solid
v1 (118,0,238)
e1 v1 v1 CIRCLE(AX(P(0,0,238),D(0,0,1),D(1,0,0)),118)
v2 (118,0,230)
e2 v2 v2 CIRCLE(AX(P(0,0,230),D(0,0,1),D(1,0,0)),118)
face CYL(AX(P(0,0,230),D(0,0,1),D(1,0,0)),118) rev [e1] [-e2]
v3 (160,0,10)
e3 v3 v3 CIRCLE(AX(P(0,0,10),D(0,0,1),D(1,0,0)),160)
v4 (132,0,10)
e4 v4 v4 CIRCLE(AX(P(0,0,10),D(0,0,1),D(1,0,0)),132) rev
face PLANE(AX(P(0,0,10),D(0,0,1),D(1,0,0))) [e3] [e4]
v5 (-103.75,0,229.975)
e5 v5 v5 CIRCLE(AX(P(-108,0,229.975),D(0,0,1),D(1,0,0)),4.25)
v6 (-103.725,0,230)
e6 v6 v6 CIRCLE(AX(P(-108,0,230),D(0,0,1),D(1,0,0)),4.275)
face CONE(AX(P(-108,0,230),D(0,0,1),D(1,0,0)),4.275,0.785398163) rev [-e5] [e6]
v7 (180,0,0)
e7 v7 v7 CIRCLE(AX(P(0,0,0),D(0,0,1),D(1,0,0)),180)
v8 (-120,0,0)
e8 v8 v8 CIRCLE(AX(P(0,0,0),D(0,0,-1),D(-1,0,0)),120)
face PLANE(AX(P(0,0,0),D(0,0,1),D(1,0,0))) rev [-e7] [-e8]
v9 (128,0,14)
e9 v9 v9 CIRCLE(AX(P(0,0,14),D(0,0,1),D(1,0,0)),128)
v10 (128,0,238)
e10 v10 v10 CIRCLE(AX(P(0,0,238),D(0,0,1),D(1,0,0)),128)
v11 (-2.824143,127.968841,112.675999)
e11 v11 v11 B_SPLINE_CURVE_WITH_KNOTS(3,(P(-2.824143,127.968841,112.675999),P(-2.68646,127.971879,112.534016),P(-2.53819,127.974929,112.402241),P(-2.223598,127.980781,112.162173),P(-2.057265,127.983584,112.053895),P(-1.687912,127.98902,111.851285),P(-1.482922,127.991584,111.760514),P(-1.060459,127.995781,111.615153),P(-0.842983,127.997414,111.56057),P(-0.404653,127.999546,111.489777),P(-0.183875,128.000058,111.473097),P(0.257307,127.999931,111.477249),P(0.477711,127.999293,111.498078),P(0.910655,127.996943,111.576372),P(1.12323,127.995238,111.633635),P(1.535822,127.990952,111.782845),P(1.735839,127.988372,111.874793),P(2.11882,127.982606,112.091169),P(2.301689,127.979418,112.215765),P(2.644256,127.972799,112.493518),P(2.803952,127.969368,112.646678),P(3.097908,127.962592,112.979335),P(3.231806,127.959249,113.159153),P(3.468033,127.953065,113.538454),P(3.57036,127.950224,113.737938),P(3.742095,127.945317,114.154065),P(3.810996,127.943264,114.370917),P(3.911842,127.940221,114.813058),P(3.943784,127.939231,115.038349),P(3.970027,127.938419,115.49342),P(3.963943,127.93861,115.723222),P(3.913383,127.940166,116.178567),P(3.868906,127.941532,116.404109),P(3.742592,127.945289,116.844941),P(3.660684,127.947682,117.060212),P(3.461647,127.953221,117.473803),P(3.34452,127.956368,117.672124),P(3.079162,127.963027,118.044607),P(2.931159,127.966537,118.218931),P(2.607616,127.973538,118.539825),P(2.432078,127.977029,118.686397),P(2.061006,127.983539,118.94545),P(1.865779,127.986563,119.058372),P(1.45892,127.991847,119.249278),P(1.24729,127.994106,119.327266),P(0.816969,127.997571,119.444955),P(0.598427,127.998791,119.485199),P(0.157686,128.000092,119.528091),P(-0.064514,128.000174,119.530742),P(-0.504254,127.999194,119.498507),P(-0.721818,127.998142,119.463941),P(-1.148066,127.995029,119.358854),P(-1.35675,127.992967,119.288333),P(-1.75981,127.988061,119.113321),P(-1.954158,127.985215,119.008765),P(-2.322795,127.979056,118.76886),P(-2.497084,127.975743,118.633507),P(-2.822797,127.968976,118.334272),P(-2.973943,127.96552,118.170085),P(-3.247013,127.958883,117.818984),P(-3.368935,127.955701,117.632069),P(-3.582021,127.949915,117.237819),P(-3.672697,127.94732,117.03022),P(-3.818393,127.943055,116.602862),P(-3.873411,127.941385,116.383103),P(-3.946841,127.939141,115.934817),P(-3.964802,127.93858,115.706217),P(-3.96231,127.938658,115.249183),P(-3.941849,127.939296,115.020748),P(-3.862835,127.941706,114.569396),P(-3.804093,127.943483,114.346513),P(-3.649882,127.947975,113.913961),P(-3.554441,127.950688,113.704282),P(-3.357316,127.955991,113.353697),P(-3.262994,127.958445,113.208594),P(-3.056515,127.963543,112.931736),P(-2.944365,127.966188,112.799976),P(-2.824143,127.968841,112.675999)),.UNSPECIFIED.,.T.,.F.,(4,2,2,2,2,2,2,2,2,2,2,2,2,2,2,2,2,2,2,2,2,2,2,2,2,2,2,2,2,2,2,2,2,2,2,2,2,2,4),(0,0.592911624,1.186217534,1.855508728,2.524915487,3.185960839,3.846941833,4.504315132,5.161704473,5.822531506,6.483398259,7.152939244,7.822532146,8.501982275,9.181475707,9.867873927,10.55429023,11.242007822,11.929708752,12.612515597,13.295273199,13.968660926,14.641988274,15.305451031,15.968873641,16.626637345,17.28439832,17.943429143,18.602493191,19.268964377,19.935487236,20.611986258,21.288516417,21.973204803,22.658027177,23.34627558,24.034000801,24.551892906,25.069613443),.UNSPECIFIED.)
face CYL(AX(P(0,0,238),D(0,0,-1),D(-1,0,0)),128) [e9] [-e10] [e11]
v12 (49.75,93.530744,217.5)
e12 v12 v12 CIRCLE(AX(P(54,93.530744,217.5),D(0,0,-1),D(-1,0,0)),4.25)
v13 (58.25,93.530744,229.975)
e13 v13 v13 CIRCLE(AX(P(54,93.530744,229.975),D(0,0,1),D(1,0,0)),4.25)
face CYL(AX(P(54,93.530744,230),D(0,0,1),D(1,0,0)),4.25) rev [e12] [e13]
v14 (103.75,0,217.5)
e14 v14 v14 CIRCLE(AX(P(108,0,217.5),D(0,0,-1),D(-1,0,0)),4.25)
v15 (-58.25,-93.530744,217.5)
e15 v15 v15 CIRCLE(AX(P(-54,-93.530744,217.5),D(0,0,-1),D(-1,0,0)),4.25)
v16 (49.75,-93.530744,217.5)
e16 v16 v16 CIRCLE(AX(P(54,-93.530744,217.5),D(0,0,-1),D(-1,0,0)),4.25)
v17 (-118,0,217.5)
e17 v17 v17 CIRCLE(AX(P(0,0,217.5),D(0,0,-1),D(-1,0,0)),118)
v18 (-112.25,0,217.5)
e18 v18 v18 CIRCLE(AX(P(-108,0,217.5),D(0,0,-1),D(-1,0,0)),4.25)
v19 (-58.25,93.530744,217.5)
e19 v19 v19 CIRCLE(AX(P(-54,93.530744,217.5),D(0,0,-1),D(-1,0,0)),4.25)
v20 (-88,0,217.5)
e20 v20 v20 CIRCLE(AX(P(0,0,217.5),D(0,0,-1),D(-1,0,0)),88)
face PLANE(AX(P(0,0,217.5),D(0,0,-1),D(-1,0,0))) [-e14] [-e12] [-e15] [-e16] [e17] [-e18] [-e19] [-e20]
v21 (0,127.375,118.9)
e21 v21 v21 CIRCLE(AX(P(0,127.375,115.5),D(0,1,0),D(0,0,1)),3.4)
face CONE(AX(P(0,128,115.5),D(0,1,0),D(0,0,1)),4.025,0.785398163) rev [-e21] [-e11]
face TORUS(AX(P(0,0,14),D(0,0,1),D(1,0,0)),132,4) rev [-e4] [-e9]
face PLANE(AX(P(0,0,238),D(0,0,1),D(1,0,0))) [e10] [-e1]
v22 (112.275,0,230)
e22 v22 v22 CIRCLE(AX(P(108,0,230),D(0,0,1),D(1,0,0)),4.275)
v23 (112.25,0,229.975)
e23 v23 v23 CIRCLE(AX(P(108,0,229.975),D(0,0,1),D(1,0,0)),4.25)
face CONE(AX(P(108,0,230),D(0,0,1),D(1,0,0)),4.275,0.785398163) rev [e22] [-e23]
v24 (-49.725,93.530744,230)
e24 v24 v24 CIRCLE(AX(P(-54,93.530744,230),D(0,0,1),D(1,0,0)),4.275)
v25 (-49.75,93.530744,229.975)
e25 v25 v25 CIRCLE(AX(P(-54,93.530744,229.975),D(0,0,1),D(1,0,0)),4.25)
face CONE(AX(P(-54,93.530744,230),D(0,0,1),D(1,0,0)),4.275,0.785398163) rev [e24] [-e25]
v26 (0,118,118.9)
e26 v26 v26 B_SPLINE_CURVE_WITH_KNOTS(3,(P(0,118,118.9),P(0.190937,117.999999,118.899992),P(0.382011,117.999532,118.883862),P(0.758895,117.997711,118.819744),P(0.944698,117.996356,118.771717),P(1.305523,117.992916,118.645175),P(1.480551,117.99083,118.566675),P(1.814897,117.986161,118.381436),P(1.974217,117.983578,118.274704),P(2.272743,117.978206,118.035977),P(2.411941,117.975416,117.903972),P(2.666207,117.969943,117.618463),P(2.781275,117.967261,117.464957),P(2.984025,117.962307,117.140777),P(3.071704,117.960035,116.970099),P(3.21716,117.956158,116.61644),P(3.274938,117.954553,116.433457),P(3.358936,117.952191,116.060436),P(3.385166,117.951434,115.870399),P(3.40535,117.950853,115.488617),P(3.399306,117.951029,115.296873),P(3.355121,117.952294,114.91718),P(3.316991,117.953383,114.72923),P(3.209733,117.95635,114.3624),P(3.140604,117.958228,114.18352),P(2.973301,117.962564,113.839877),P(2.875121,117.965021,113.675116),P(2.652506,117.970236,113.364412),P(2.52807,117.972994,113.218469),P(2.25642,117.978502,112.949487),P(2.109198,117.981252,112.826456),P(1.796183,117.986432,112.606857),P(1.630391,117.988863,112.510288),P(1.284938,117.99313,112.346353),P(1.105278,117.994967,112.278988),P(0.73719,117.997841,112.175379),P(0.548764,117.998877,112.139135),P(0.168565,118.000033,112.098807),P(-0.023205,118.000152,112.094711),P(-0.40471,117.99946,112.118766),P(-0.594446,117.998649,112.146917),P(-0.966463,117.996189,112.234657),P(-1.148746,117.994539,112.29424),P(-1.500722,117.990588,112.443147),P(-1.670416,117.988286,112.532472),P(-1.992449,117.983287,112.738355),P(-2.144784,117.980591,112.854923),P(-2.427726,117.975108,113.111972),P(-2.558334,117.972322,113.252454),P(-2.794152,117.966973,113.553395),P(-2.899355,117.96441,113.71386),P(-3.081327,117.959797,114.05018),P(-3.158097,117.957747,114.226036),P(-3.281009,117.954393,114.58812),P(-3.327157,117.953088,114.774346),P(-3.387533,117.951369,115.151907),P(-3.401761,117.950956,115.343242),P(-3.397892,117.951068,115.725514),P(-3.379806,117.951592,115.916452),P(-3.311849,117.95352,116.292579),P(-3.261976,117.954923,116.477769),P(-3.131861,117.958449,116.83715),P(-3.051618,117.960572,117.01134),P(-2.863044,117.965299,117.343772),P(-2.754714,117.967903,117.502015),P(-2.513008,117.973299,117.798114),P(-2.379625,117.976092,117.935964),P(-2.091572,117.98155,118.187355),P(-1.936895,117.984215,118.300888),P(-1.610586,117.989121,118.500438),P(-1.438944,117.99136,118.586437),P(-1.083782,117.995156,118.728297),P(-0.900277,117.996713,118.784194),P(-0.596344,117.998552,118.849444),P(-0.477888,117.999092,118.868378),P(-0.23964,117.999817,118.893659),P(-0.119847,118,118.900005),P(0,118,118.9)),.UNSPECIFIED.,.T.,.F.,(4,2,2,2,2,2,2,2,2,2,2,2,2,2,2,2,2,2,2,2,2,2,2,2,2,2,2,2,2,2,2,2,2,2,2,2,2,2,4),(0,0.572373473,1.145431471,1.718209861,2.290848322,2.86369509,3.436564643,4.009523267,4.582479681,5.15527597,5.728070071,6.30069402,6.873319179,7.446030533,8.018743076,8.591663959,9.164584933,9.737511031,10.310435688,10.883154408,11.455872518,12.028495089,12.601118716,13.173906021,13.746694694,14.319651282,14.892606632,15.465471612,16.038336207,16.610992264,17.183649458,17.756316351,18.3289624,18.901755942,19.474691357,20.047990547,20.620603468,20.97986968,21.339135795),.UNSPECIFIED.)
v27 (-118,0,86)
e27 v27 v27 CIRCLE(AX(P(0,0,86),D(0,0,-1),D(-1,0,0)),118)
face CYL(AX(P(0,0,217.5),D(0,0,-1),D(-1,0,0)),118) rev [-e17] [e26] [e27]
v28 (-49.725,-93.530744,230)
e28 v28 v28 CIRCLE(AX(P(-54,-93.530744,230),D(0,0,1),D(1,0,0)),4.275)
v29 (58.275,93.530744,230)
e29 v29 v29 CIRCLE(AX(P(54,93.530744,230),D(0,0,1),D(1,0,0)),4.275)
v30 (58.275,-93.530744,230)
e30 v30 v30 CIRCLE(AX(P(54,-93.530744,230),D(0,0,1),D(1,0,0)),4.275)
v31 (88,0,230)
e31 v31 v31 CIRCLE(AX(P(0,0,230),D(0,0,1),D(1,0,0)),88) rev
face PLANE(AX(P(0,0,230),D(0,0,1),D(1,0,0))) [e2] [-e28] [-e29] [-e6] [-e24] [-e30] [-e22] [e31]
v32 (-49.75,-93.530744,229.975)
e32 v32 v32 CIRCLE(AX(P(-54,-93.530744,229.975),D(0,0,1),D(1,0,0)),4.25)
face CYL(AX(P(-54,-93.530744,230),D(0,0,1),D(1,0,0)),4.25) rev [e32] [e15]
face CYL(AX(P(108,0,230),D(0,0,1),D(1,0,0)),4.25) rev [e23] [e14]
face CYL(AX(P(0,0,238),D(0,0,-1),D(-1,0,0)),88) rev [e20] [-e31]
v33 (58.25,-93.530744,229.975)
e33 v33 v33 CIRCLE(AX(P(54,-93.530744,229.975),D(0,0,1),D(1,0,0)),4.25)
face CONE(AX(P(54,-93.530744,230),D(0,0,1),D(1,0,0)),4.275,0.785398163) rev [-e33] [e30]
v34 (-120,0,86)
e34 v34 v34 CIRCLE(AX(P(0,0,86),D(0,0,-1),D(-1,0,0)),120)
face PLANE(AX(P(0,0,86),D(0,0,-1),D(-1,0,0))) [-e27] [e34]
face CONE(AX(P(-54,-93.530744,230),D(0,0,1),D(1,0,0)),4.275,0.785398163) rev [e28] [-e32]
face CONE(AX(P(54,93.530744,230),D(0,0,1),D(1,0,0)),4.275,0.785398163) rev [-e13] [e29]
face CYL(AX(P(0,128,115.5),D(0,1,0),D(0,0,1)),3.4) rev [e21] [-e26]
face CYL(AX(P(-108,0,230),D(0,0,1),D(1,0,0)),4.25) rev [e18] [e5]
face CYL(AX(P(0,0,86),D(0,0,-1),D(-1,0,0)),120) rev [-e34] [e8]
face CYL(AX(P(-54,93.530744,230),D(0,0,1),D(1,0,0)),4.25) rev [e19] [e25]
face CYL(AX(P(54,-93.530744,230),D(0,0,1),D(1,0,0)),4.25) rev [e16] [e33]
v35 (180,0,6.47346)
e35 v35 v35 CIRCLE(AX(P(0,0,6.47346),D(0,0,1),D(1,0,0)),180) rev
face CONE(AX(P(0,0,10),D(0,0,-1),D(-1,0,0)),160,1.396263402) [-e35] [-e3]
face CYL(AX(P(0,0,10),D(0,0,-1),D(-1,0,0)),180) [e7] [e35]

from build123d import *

# Parameters (mm, degrees)
SKETCH_1_R                    = 180
EXTRUDE_1_DEPTH               = 10
SKETCH_2_R                    = 128
EXTRUDE_2_DEPTH               = 238
SKETCH_3_R                    = 120
CUT_EXTRUDE_1_DEPTH           = 86
SKETCH_4_R                    = 118
CUT_EXTRUDE_2_DEPTH           = 131.5
SKETCH_5_R                    = 88
CUT_EXTRUDE_3_DEPTH           = 335.822714283
CUT_EXTRUDE_START             = -8
SKETCH_6_R                    = 118
CUT_EXTRUDE_4_DEPTH           = 8
HOLE_WIZARD_M10_1_D           = 8.5
HOLE_WIZARD_M10_1_CSINK_D     = 8.55
HOLE_WIZARD_M10_1_CSINK_ANGLE = 90
FILLET_1_R                    = 4
CHAMFER_1_SIZE                = 20
CHAMFER_1_SIZE2               = 3.526539614


# Read off the part's stored shape, not the designer's step: M8 螺纹孔1
with BuildPart() as part:
    # 草图1 → 凸台-拉伸1 (new body)
    with BuildSketch(Plane.XY):
        Circle(SKETCH_1_R)
    extrude(amount=EXTRUDE_1_DEPTH)

    # 草图2 → 凸台-拉伸2 (add)
    with BuildSketch(Plane.XY):
        Circle(SKETCH_2_R)
    extrude(amount=EXTRUDE_2_DEPTH)

    # 草图3 → 切除-拉伸1 (cut)
    with BuildSketch(Plane(origin=(0, 0, 0), x_dir=(-1, 0, 0), z_dir=(0, 0, -1))):
        Circle(SKETCH_3_R)
    extrude(amount=-CUT_EXTRUDE_1_DEPTH, mode=Mode.SUBTRACT)

    # 草图4 → 切除-拉伸2 (cut)
    with BuildSketch(Plane(origin=(0, 0, 86), x_dir=(-1, 0, 0), z_dir=(0, 0, -1))):
        Circle(SKETCH_4_R)
    extrude(amount=-CUT_EXTRUDE_2_DEPTH, mode=Mode.SUBTRACT)

    # 草图5 → 切除-拉伸3 (cut, through all)
    with BuildSketch(Plane(origin=(0, 0, 217.5), x_dir=(-1, 0, 0), z_dir=(0, 0, -1))):
        Circle(SKETCH_5_R)
    extrude(amount=-CUT_EXTRUDE_3_DEPTH, mode=Mode.SUBTRACT)

    # 草图6 → 切除-拉伸4 (cut)
    with BuildSketch(Plane.XY.offset(238).offset(CUT_EXTRUDE_START)):
        with Locations(Location((0, 0, 0), (0, 0, 180))):
            Circle(SKETCH_6_R)
    extrude(amount=CUT_EXTRUDE_4_DEPTH, mode=Mode.SUBTRACT)

    # M10 螺纹孔的螺纹孔钻头1 (through all)
    with Locations(Plane.XY.offset(230)):
        with Locations((108, 0), (54, -93.530743609), (-54, -93.530743609), (-108, 0), (-54, 93.530743609), (54, 93.530743609)):
            CounterSinkHole(HOLE_WIZARD_M10_1_D / 2, HOLE_WIZARD_M10_1_CSINK_D / 2, counter_sink_angle=HOLE_WIZARD_M10_1_CSINK_ANGLE)

    # 圆角1
    fillet_1_edges = [part.edges().sort_by_distance(p)[0] for p in [
        (-128, 0, 10),
    ]]
    fillet(fillet_1_edges, radius=FILLET_1_R)

    # 倒角1
    chamfer_1_edges = [part.edges().sort_by_distance(p)[0] for p in [
        (-180, 0, 10),
    ]]
    chamfer_1_side = [part.faces().sort_by_distance(p)[0] for p in [
        (-137.091168825, 0, 10),
    ]]
    chamfer(chamfer_1_edges, length=CHAMFER_1_SIZE, length2=CHAMFER_1_SIZE2, reference=chamfer_1_side[0])

    # M8 螺纹孔1 outline → M8 螺纹孔1 (revolve, cut)
    with BuildSketch(Plane.XY.offset(115.5)):
        Polygon((4.025021706, 128.000021706), (0, 128.000021706), (0, 117.951000003), (3.4, 117.951000003), (3.4, 127.375), align=None)
    revolve(axis=Axis((0, 0, 115.5), (0, 1, 0)), mode=Mode.SUBTRACT)


solid = part.part
